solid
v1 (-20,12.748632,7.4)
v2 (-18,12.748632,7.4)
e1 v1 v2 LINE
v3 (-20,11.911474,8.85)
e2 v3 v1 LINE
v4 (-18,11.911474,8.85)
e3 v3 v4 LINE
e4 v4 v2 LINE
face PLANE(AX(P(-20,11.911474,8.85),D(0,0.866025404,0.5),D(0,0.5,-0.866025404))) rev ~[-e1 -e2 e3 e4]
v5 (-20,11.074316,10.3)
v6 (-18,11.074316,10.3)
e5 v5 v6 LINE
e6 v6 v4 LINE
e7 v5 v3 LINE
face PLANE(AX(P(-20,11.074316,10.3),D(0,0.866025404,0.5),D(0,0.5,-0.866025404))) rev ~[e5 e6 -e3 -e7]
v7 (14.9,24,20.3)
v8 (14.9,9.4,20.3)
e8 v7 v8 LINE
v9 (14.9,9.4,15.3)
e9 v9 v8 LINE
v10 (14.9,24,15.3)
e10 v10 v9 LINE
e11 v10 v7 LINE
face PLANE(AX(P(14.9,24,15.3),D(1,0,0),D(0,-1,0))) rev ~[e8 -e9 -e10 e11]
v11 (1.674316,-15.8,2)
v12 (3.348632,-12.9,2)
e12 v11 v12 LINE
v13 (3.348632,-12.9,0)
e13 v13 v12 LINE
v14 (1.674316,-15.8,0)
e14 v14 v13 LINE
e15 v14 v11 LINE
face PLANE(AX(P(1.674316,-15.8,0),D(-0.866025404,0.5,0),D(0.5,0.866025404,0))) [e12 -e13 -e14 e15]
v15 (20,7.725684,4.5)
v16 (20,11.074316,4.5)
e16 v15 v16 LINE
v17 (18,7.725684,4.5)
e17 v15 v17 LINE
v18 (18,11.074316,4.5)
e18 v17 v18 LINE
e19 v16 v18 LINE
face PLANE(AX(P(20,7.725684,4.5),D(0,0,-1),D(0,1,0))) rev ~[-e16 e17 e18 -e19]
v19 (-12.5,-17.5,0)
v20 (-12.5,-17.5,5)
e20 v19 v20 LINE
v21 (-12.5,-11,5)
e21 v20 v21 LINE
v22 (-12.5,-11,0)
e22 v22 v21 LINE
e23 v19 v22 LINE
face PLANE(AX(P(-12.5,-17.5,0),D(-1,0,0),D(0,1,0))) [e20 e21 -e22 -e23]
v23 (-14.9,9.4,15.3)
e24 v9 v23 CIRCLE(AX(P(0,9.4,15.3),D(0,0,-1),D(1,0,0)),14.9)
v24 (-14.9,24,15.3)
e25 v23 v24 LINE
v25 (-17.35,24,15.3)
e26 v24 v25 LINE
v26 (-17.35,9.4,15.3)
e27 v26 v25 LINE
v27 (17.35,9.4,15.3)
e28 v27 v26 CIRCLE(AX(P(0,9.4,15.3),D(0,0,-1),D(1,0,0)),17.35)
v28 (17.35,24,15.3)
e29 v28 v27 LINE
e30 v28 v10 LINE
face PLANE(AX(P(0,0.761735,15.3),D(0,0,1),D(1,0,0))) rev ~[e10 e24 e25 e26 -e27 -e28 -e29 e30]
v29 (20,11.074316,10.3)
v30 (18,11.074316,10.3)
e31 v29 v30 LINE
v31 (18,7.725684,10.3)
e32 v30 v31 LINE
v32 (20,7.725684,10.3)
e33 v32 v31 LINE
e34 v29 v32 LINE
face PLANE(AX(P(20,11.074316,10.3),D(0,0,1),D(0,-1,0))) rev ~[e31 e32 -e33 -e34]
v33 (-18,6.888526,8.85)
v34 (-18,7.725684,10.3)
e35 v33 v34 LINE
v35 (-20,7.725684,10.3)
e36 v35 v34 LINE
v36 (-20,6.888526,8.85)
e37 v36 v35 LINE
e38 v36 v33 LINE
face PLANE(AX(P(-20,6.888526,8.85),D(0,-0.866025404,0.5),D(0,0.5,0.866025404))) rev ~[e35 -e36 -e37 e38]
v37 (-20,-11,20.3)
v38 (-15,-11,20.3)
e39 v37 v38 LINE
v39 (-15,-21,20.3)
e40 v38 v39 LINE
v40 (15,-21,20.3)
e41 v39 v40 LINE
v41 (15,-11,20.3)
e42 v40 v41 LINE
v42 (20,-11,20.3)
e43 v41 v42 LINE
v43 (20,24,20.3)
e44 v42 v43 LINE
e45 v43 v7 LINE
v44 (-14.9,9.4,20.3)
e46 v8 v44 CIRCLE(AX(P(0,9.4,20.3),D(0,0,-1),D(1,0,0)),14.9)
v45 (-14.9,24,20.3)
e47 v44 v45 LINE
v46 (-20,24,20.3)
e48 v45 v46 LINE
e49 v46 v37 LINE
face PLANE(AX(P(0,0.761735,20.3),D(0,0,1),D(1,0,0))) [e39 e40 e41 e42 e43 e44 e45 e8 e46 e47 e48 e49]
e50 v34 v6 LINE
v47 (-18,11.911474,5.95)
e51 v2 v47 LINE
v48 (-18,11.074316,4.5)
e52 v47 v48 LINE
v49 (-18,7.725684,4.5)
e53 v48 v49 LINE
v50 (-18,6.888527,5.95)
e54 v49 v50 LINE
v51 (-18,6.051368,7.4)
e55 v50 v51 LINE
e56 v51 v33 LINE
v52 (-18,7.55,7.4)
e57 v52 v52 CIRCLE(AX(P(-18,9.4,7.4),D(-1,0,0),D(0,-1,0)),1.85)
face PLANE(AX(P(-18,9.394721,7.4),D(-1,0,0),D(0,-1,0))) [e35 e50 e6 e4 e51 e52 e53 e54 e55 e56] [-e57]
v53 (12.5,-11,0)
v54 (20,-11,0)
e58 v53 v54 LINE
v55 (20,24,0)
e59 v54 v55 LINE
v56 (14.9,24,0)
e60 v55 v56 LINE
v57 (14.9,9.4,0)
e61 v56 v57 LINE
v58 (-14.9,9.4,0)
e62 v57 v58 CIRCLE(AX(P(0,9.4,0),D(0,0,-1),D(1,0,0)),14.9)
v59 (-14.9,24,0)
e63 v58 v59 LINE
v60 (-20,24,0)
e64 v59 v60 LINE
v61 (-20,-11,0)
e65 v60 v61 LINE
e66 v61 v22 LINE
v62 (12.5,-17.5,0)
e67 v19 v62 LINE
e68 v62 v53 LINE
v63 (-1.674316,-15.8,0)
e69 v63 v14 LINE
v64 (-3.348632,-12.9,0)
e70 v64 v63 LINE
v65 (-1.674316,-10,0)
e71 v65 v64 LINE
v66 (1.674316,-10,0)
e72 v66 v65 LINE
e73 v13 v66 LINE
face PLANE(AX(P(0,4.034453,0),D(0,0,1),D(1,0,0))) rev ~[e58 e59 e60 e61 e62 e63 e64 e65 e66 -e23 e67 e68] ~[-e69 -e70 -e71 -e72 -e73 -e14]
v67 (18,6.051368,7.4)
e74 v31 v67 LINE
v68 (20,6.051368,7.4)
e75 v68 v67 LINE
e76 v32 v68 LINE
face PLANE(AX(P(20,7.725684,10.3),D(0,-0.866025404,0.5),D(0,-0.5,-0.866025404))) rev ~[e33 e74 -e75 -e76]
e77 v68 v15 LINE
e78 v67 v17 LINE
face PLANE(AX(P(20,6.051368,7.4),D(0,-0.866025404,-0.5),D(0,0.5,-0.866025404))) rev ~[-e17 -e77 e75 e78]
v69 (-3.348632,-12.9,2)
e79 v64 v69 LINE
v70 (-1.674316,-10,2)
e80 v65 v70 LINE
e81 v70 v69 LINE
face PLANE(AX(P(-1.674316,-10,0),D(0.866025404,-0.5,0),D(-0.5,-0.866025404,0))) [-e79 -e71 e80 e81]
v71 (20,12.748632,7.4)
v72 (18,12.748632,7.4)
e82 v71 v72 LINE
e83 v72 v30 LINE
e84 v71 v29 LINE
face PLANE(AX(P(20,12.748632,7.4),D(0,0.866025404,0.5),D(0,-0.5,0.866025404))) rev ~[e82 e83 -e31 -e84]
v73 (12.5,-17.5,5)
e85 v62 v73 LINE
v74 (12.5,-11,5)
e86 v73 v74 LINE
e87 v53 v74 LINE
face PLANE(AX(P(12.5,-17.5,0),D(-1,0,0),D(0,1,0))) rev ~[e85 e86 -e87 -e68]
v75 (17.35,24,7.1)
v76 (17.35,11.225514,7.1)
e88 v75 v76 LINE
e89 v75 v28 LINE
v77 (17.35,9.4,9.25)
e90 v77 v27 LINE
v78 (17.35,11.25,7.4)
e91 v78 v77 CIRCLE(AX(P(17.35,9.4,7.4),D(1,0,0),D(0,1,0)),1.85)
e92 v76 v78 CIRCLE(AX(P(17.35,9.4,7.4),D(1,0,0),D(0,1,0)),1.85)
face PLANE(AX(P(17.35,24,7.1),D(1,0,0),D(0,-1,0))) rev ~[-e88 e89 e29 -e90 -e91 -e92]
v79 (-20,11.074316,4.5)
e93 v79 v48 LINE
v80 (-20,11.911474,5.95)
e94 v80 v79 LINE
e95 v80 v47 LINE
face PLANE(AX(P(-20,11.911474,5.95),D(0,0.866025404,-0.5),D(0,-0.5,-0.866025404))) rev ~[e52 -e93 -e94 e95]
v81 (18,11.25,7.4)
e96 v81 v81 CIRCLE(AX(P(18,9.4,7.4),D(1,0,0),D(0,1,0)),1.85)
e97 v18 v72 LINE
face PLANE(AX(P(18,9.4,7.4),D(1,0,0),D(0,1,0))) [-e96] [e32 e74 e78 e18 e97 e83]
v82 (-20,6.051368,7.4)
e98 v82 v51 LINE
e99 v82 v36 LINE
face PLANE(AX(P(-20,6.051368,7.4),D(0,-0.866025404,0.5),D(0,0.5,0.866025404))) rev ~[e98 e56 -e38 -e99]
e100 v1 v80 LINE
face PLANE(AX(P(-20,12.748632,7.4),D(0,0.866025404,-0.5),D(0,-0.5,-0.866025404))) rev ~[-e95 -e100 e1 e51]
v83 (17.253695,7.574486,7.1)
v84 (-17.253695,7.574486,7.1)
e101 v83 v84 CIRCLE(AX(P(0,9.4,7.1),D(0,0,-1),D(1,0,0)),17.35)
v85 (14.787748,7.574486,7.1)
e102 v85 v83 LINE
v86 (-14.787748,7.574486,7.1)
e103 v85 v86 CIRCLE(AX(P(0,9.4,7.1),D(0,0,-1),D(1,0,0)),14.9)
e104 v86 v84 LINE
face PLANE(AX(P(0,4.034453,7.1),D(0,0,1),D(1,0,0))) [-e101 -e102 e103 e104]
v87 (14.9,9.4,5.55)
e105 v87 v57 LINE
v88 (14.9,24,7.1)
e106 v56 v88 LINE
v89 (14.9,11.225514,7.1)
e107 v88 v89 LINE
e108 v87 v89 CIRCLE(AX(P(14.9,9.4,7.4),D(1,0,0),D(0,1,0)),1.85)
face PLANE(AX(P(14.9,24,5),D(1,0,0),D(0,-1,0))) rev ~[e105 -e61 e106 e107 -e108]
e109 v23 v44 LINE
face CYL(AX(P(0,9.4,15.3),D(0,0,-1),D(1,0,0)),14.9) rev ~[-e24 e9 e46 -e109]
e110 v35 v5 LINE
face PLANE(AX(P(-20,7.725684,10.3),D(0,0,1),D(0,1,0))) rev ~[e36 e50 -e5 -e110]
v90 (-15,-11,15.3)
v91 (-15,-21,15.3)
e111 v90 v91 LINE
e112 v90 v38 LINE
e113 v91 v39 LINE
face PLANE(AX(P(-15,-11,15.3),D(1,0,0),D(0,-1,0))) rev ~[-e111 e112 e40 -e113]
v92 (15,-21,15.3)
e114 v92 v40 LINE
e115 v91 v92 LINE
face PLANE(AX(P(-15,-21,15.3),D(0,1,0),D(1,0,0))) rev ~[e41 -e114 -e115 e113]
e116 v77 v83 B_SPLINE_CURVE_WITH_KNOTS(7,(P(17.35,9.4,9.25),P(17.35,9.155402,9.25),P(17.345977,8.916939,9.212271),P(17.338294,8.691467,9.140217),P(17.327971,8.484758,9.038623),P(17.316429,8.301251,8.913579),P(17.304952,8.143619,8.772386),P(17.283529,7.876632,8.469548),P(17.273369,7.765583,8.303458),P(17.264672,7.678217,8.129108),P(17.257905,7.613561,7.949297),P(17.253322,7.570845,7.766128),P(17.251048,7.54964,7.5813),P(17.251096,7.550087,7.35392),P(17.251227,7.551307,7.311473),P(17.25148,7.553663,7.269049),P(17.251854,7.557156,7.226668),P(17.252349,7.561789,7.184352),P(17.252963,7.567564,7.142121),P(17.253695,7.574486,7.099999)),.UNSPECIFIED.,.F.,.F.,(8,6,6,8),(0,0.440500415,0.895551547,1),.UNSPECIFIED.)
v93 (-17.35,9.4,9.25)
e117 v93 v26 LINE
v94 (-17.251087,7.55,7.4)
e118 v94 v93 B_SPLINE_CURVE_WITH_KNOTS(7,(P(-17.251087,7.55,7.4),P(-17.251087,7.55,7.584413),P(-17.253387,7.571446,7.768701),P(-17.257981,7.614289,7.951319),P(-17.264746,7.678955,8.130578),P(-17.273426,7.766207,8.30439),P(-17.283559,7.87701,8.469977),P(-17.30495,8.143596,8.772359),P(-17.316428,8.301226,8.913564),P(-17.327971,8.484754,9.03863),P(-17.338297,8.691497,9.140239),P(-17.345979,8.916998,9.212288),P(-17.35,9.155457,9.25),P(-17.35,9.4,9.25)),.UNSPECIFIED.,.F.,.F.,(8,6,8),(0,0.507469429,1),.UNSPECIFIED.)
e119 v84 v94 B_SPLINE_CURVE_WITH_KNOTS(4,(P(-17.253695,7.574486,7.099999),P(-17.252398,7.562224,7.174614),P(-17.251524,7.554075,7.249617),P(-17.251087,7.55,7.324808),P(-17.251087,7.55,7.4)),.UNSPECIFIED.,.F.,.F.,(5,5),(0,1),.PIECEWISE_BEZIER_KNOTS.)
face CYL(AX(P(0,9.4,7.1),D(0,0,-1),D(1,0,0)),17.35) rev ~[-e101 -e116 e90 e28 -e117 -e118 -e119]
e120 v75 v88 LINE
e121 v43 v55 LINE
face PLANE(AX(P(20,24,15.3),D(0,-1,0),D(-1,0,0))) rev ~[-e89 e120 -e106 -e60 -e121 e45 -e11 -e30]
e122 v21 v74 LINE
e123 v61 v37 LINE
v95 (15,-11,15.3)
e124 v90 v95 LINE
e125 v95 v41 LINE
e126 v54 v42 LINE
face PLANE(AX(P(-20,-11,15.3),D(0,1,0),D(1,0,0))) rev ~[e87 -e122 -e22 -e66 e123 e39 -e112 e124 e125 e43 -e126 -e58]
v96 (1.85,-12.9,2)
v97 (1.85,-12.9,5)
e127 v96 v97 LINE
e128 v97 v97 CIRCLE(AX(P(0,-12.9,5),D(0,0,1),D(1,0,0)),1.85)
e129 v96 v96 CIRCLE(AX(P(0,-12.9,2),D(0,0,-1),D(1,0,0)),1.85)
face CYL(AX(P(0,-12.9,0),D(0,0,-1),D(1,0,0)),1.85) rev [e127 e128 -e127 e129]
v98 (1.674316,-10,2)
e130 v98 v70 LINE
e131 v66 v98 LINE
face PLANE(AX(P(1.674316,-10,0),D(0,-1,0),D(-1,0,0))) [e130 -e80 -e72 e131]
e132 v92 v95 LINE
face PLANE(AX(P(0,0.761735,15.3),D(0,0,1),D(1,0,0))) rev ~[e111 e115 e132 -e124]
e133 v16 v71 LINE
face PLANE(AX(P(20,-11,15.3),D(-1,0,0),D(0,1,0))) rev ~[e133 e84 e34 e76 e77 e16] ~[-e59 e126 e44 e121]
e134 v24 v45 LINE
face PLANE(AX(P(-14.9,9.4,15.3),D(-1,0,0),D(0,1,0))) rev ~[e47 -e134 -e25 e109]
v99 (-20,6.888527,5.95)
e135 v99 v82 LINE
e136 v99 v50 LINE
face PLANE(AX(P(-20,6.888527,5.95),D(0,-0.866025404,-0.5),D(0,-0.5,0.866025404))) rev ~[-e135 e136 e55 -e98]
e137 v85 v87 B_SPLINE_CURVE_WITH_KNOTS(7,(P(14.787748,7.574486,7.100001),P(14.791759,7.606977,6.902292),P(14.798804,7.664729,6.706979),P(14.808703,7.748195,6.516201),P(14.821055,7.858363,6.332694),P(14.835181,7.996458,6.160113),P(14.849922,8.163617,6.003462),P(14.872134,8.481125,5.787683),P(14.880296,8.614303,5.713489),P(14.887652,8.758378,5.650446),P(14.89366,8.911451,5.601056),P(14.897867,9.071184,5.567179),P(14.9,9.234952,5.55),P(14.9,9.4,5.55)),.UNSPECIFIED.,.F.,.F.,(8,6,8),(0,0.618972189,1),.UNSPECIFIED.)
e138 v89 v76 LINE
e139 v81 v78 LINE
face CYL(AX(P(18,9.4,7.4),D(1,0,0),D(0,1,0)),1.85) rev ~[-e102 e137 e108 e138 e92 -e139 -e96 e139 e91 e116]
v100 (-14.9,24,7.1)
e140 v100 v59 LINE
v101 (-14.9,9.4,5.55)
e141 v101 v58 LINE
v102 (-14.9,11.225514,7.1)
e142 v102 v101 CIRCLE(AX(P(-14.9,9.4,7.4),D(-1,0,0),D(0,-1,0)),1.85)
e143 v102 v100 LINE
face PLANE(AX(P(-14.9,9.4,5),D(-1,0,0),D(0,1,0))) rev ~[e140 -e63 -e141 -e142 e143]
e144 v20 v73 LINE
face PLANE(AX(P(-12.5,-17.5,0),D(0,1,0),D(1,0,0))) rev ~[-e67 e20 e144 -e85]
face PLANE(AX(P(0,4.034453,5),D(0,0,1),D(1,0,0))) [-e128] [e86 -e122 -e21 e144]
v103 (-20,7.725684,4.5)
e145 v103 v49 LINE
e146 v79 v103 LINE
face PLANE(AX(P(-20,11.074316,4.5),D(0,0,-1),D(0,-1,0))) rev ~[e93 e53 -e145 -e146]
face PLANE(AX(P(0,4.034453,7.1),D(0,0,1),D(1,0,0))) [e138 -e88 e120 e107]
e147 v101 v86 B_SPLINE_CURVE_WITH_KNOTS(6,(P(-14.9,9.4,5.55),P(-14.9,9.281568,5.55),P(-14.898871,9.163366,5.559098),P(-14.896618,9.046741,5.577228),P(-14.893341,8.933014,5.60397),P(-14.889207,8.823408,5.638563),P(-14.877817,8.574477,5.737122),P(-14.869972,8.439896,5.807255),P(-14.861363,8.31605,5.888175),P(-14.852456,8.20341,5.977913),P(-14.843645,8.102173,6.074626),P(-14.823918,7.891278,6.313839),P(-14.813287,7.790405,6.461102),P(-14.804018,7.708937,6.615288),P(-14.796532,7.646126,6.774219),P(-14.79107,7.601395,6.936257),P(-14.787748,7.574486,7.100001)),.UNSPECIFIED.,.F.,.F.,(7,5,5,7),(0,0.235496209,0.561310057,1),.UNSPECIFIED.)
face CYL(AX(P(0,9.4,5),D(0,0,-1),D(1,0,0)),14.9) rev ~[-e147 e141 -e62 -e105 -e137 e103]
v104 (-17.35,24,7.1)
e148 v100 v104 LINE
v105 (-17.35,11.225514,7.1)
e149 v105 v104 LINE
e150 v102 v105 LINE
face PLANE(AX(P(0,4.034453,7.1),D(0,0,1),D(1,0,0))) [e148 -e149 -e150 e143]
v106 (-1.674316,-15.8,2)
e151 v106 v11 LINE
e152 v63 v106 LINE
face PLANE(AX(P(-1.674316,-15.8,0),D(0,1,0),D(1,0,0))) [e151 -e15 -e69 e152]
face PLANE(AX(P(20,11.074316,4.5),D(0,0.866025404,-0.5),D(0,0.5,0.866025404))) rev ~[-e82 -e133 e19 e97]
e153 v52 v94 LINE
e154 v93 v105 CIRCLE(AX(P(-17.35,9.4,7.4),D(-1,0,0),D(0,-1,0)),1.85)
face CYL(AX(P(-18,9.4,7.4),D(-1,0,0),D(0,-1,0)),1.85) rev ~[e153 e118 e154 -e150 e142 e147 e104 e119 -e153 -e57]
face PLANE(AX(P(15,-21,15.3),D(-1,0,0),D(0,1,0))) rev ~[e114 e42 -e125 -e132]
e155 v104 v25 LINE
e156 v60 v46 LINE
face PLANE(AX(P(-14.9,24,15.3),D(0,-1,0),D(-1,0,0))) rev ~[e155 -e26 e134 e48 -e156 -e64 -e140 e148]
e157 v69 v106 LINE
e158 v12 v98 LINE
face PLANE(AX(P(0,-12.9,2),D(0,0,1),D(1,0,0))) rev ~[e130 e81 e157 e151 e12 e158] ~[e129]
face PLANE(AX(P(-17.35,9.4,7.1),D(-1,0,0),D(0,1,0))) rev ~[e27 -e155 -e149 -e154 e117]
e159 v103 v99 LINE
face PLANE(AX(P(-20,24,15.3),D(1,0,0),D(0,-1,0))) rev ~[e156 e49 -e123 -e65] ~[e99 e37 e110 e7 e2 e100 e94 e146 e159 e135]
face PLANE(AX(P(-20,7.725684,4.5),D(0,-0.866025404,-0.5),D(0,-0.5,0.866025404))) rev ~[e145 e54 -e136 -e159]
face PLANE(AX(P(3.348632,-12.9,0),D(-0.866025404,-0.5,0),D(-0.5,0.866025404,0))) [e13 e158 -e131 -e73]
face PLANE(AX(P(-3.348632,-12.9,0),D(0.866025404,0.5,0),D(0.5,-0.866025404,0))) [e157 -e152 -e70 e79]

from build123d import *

# Parameters (mm, degrees)
F0_W      = 25
F0_H      = 6.5
F0_R      = 1.85
F1_DEPTH  = 5
F3_DEPTH  = 2.1
F5_DEPTH  = 8.2
F7_DEPTH  = 5
F9_DEPTH  = 2
F11_DEPTH = 2
F12_R     = 1.85
F13_DEPTH = 5
F14_R     = 1.85
F15_DEPTH = 5
F17_DEPTH = 2


# Not quite as in the source:
# - a feature names something its author has since deleted; it is built from what else it names


with BuildPart() as f1:
    # F0 (on Top) → F1 (new body)
    with BuildSketch(Plane.XY):
        with BuildLine():
            Line((-14.9, 24), (-20, 24))
            Line((-20, 24), (-20, -11))
            Line((-20, -11), (-12.5, -11))
            Line((-12.5, -11), (12.5, -11))
            Line((12.5, -11), (20, -11))
            Line((20, -11), (20, 24))
            Line((20, 24), (14.9, 24))
            Line((14.9, 24), (14.9, 9.4))
            ThreePointArc((14.9, 9.4), (0, -5.5), (-14.9, 9.4))
            Line((-14.9, 9.4), (-14.9, 24))
        make_face()
        with Locations((0, -14.25)):
            Rectangle(F0_W, F0_H)
        with Locations((0, -12.9)):
            Circle(F0_R, mode=Mode.SUBTRACT)
    extrude(amount=F1_DEPTH)

    # F2 (on face) → F3 (join)
    with BuildSketch(Plane.XY.offset(5)):
        with BuildLine():
            Line((-14.9, 24), (-20, 24))
            Line((-20, 24), (-20, -11))
            Line((-20, -11), (20, -11))
            Line((20, -11), (20, 24))
            Line((20, 24), (14.9, 24))
            Line((14.9, 24), (14.9, 9.4))
            ThreePointArc((14.9, 9.4), (0, -5.5), (-14.9, 9.4))
            Line((-14.9, 9.4), (-14.9, 24))
        make_face()
    extrude(amount=F3_DEPTH)

    # F4 (on face) → F5 (join)
    with BuildSketch(Plane.XY.offset(7.1)):
        with BuildLine():
            Line((-17.35, 24), (-20, 24))
            Line((-20, 24), (-20, -11))
            Line((-20, -11), (20, -11))
            Line((20, -11), (20, 24))
            Line((20, 24), (17.35, 24))
            Line((17.35, 24), (17.35, 9.4))
            ThreePointArc((17.35, 9.4), (0, -7.95), (-17.35, 9.4))
            Line((-17.35, 9.4), (-17.35, 24))
        make_face()
    extrude(amount=F5_DEPTH)

    # F6 (on face) → F7 (join)
    with BuildSketch(Plane.XY.offset(15.3)):
        with BuildLine():
            Line((-14.9, 24), (-20, 24))
            Line((-20, 24), (-20, -11))
            Line((-20, -11), (-15, -11))
            Line((-15, -11), (-15, -21))
            Line((-15, -21), (15, -21))
            Line((15, -21), (15, -11))
            Line((15, -11), (20, -11))
            Line((20, -11), (20, 24))
            Line((20, 24), (14.9, 24))
            Line((14.9, 24), (14.9, 9.4))
            ThreePointArc((14.9, 9.4), (0, -5.5), (-14.9, 9.4))
            Line((-14.9, 9.4), (-14.9, 24))
        make_face()
    extrude(amount=F7_DEPTH)

    # F8 (on face) → F9 (cut)
    with BuildSketch(Plane(origin=(-20, 0, 0), x_dir=(0, -1, 0), z_dir=(-1, 0, 0))):
        with BuildLine():
            ThreePointArc((-6.8885265259, 5.9499996589), (-6.5988151547, 6.649424579), (-6.5, 7.4))
            ThreePointArc((-6.5, 7.4), (-6.598815139, 8.1505753623), (-6.8885264651, 8.8500002357))
            ThreePointArc((-6.8885264651, 8.8500002357), (-7.9500001179, 9.911473739), (-9.4, 10.3))
            ThreePointArc((-9.4, 10.3), (-10.849999907, 9.9114737247), (-11.9114735636, 8.850000186))
            ThreePointArc((-11.9114735636, 8.850000186), (-12.3, 7.3999999856), (-11.9114735492, 5.9499997892))
            ThreePointArc((-11.9114735492, 5.9499997892), (-10.8499998946, 4.8885262682), (-9.4, 4.5))
            ThreePointArc((-9.4, 4.5), (-7.9500001705, 4.8885262306), (-6.8885265259, 5.9499996589))
        make_face()
        with BuildLine():
            ThreePointArc((-6.8885264651, 8.8500002357), (-6.598815139, 8.1505753623), (-6.5, 7.4))
            ThreePointArc((-6.5, 7.4), (-6.5988151547, 6.649424579), (-6.8885265259, 5.9499996589))
            Line((-6.8885265259, 5.9499996589), (-6.0513684387, 7.4))
            Line((-6.0513684387, 7.4), (-6.8885264651, 8.8500002357))
        make_face()
        with BuildLine():
            ThreePointArc((-9.4, 10.3), (-7.9500001179, 9.911473739), (-6.8885264651, 8.8500002357))
            Line((-6.8885264651, 8.8500002357), (-7.7256842194, 10.3))
            Line((-7.7256842194, 10.3), (-9.4, 10.3))
        make_face()
        with BuildLine():
            Line((-7.7256842194, 4.5), (-6.8885265259, 5.9499996589))
            ThreePointArc((-6.8885265259, 5.9499996589), (-7.9500001705, 4.8885262306), (-9.4, 4.5))
            Line((-9.4, 4.5), (-7.7256842194, 4.5))
        make_face()
        with BuildLine():
            ThreePointArc((-11.9114735636, 8.850000186), (-10.849999907, 9.9114737247), (-9.4, 10.3))
            Line((-9.4, 10.3), (-11.0743157806, 10.3))
            Line((-11.0743157806, 10.3), (-11.9114735636, 8.850000186))
        make_face()
        with BuildLine():
            Line((-11.0743157806, 4.5), (-9.4, 4.5))
            ThreePointArc((-9.4, 4.5), (-10.8499998946, 4.8885262682), (-11.9114735492, 5.9499997892))
            Line((-11.9114735492, 5.9499997892), (-11.0743157806, 4.5))
        make_face()
        with BuildLine():
            ThreePointArc((-11.9114735492, 5.9499997892), (-12.3, 7.3999999856), (-11.9114735636, 8.850000186))
            Line((-11.9114735636, 8.850000186), (-12.7486315613, 7.4))
            Line((-12.7486315613, 7.4), (-11.9114735492, 5.9499997892))
        make_face()
    extrude(amount=-F9_DEPTH, mode=Mode.SUBTRACT)

    # F10 (on face) → F11 (cut)
    with BuildSketch(Plane.YZ.offset(20)):
        Polygon((11.0743157806, 10.3), (7.7256842194, 10.3), (6.0513684387, 7.4), (7.7256842194, 4.5), (11.0743157806, 4.5), (12.7486315613, 7.4), align=None)
    extrude(amount=-F11_DEPTH, mode=Mode.SUBTRACT)

    # F12 (on face) → F13 (cut)
    with BuildSketch(Plane.YZ.offset(18)):
        with Locations((9.4, 7.4)):
            Circle(F12_R)
    extrude(amount=-F13_DEPTH, mode=Mode.SUBTRACT)

    # F14 (on face) → F15 (cut)
    with BuildSketch(Plane(origin=(-18, 0, 0), x_dir=(0, -1, 0), z_dir=(-1, 0, 0))):
        with Locations((-9.4, 7.4)):
            Circle(F14_R)
    extrude(amount=-F15_DEPTH, mode=Mode.SUBTRACT)

    # F16 (on Top) → F17 (cut)
    with BuildSketch(Plane.XY):
        Polygon((-1.6743157806, -15.8), (1.6743157806, -15.8), (3.3486315613, -12.9), (1.6743157806, -10), (-1.6743157806, -10), (-3.3486315613, -12.9), align=None)
    extrude(amount=F17_DEPTH, mode=Mode.SUBTRACT)


solid = f1.part
